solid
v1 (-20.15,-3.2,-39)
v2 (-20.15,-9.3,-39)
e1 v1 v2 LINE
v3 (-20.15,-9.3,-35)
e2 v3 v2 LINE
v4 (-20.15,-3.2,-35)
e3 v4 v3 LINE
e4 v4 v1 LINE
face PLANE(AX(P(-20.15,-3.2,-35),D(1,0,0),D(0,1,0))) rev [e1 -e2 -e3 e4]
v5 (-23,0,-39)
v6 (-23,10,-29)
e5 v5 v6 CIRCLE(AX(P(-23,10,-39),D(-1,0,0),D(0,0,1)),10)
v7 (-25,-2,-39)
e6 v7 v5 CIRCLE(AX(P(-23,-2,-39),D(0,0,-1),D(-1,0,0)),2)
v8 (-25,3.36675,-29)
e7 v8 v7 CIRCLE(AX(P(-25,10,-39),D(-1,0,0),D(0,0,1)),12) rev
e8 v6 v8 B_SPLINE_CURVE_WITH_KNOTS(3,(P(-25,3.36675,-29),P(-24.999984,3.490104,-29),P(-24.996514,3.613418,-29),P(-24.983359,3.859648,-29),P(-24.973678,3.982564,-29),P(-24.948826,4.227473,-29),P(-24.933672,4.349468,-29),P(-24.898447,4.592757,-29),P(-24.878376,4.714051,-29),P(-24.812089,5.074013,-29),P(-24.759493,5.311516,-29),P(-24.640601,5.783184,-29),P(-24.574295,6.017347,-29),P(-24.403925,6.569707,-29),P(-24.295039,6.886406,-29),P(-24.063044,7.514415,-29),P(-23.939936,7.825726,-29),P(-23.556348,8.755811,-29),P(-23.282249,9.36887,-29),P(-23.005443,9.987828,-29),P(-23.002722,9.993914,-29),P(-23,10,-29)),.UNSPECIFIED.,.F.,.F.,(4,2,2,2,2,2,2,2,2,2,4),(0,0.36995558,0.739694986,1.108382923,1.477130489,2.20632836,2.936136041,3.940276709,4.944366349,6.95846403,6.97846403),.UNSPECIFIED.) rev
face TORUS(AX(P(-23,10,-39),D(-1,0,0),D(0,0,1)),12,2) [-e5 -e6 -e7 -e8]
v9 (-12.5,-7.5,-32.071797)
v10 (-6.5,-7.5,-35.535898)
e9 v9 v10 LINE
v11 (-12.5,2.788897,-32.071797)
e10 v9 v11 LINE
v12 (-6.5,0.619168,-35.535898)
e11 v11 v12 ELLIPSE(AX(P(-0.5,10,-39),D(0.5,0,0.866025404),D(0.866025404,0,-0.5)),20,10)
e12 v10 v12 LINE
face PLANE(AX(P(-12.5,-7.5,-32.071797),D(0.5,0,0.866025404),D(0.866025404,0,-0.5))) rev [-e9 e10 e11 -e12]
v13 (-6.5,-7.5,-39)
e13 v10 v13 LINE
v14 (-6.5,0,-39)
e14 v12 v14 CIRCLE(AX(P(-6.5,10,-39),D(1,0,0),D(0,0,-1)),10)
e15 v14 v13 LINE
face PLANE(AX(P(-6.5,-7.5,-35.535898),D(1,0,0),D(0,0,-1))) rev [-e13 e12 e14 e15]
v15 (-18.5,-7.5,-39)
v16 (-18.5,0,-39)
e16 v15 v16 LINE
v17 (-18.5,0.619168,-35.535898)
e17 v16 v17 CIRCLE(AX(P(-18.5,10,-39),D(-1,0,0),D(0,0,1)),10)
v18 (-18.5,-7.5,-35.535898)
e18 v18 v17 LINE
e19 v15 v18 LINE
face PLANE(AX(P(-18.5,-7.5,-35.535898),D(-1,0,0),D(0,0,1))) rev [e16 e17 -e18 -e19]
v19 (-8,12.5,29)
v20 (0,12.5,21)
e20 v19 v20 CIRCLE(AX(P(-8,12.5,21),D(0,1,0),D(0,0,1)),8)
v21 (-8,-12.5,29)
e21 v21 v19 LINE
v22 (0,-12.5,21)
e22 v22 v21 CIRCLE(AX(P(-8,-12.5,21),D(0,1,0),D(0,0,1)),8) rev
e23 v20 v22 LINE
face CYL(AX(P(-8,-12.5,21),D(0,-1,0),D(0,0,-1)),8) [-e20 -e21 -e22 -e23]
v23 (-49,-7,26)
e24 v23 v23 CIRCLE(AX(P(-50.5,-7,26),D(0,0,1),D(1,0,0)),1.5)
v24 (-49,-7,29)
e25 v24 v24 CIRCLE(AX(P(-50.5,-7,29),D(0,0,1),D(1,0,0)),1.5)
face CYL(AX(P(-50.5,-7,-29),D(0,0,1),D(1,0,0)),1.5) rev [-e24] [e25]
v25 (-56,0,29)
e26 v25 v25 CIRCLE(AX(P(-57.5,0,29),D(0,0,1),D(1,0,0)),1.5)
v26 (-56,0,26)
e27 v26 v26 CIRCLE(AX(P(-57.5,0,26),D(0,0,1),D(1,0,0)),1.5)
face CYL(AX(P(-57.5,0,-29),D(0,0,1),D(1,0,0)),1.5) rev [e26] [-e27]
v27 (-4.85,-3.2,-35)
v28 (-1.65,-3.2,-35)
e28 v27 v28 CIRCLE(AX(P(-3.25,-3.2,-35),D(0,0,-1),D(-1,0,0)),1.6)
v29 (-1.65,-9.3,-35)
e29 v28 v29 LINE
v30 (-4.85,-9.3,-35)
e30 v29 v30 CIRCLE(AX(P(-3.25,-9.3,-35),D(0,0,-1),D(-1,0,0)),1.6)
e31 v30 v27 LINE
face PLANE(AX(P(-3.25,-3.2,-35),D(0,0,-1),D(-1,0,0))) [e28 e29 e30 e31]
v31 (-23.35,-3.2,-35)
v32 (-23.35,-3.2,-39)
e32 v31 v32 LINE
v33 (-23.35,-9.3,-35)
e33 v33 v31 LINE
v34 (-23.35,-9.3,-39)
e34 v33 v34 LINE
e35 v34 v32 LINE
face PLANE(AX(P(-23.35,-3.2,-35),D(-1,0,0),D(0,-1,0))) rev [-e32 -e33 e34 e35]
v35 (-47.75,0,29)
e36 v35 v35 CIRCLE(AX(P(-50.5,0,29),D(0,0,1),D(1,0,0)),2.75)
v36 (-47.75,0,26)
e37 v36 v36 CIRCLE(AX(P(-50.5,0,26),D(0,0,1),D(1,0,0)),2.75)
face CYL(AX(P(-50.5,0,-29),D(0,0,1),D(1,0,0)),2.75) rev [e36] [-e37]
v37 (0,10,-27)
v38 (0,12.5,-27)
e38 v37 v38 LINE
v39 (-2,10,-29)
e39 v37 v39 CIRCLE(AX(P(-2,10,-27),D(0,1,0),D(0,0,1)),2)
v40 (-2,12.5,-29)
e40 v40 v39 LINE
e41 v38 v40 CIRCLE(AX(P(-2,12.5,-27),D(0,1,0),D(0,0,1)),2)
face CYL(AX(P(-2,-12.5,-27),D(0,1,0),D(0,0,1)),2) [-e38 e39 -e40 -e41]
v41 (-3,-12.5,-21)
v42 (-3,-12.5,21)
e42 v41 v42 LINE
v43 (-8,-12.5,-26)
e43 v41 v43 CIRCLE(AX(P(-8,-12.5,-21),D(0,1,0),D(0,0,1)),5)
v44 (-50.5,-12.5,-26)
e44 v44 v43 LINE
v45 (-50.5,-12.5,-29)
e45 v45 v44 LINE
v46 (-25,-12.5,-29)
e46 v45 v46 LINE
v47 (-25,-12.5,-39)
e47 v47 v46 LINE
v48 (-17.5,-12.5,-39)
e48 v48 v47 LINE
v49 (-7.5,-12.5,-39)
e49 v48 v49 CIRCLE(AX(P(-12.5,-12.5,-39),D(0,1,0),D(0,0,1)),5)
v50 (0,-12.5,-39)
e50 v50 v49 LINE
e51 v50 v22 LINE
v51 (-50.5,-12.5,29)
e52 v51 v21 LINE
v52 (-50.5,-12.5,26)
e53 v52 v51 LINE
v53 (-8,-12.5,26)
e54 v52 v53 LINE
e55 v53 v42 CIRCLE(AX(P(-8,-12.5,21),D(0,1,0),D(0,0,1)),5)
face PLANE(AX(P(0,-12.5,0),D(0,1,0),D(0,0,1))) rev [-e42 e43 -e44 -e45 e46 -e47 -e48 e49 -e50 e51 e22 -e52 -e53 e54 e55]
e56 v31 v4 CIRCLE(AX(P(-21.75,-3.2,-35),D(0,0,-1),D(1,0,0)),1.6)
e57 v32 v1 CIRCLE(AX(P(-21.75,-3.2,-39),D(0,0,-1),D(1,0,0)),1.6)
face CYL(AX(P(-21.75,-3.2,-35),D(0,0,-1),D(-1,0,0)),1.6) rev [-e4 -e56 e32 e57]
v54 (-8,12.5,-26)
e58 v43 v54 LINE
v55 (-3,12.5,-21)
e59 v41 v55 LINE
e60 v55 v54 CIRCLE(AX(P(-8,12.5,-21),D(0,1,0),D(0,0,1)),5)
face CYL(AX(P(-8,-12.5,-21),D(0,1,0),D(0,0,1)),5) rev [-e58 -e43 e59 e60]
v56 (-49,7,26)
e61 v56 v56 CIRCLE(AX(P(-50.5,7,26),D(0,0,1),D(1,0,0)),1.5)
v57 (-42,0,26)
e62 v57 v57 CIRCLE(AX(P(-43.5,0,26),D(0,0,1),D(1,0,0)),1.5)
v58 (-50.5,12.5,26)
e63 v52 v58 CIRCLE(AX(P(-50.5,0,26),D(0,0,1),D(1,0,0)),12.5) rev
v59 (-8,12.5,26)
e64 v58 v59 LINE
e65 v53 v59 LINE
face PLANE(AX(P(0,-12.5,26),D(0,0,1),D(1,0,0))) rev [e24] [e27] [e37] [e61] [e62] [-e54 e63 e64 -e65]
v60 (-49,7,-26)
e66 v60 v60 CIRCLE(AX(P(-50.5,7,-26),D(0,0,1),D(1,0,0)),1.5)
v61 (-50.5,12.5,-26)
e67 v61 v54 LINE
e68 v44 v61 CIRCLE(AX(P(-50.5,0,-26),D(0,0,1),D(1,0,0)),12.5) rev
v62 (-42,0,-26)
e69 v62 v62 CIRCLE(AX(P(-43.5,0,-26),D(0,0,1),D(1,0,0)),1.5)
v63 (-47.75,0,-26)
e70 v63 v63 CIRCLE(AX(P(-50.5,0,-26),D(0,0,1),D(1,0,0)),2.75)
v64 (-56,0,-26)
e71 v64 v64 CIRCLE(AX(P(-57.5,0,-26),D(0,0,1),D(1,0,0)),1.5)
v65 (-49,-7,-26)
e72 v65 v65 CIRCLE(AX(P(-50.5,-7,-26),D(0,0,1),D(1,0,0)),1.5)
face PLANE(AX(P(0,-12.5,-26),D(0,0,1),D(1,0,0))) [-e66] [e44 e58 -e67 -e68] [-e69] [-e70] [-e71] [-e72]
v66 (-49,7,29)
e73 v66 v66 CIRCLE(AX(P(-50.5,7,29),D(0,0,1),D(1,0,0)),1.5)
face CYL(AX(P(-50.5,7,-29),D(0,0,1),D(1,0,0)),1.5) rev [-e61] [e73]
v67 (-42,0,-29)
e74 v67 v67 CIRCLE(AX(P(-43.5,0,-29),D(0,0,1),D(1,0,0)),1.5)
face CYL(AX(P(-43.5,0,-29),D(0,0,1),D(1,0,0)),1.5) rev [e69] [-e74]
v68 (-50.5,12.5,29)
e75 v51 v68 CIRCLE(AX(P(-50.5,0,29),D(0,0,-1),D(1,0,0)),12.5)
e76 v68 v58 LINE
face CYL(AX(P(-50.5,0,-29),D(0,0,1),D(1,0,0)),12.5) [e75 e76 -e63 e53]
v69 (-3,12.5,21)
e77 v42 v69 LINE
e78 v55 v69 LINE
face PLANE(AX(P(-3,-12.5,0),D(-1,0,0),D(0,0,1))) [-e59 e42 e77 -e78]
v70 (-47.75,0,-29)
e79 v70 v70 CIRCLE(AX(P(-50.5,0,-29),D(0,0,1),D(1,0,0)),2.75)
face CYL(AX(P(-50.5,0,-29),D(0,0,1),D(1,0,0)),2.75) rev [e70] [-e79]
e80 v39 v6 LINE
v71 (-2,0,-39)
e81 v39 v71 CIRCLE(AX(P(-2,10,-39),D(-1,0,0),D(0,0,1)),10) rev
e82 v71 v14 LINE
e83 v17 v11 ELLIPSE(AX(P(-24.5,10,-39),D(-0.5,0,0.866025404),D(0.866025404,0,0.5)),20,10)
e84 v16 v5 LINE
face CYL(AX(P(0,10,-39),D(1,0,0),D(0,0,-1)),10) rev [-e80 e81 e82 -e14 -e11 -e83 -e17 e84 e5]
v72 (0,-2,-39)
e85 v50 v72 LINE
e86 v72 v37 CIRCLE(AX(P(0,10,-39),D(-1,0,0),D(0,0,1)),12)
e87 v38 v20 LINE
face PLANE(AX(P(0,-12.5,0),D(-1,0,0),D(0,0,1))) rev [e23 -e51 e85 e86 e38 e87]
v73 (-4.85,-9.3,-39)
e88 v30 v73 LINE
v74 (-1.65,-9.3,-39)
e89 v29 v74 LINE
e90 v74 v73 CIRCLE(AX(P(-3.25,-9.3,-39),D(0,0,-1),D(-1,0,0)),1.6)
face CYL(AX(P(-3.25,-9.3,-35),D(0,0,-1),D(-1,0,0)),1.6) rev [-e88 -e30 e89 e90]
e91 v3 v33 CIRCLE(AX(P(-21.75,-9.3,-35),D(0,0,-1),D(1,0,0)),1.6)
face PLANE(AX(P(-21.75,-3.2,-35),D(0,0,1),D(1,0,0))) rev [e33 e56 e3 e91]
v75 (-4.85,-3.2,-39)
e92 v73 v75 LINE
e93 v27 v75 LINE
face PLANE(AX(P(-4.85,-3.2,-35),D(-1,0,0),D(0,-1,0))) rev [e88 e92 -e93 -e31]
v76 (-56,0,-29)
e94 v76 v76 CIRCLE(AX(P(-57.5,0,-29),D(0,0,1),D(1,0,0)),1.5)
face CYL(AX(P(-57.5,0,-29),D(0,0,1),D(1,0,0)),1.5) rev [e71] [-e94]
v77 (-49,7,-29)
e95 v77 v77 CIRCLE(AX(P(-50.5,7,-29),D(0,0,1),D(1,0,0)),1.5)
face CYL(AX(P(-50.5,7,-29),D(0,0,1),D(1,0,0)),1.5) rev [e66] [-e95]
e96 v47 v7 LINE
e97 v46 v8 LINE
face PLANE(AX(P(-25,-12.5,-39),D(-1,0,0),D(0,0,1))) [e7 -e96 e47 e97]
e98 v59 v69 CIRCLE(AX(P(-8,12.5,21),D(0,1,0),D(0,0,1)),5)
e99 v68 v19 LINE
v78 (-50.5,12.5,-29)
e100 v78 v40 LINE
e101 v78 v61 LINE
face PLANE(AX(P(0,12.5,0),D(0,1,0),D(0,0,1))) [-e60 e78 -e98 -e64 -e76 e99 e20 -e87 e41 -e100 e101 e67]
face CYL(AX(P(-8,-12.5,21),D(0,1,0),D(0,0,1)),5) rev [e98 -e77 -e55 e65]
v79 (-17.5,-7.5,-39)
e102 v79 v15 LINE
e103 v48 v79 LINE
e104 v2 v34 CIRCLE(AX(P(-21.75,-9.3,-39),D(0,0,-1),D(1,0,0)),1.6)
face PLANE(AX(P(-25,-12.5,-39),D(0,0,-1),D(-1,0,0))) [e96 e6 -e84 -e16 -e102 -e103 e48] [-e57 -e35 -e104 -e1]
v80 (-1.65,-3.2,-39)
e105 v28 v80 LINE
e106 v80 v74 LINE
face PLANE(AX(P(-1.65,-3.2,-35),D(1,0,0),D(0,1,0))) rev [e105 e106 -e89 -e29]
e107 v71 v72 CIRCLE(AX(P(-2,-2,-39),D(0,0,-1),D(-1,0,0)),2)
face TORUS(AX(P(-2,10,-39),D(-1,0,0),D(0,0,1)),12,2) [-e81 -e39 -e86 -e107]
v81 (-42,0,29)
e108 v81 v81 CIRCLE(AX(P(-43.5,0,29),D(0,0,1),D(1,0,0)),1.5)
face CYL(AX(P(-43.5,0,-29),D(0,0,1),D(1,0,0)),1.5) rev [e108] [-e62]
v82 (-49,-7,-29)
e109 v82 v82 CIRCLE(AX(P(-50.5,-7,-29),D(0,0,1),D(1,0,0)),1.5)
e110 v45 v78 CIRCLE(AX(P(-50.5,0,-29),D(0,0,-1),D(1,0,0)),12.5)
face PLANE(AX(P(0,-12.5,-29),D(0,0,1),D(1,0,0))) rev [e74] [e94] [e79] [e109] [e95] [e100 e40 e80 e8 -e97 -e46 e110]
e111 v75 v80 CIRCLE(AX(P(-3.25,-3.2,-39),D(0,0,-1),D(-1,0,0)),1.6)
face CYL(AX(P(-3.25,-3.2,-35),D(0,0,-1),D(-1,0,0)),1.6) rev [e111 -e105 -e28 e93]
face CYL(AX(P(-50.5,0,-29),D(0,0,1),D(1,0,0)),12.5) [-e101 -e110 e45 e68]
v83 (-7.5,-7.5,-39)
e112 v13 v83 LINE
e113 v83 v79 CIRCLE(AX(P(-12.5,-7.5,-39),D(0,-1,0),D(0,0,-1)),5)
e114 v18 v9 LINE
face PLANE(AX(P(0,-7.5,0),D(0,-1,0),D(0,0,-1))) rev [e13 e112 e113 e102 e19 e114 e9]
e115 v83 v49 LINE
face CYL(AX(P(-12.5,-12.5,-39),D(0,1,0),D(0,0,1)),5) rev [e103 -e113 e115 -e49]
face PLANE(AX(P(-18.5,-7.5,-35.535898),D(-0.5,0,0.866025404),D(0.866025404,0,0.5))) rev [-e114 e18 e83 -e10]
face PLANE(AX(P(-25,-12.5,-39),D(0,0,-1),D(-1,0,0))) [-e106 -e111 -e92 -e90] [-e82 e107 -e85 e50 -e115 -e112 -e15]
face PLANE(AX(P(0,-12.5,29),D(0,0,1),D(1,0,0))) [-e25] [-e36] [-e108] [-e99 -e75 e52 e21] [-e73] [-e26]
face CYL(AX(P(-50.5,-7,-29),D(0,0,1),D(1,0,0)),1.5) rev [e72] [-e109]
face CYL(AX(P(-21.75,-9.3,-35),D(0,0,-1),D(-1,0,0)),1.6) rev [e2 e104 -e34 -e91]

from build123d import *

# Parameters (mm, degrees)
BOSS_EXTRU_1_DEPTH      = 12.5
BOSS_EXTRU_1_DEPTH_BACK = 12.5
ESQUISSE2_R             = 2.75
ESQUISSE2_R_2           = 1.5
ENL_V_MAT_EXTRU_2_DEPTH = 87.540452969
ESQUISSE3_W             = 25
ESQUISSE3_H             = 10
BOSS_EXTRU_2_DEPTH      = 12.5
ENL_V_MAT_EXTRU_3_DEPTH = 7.5
CONG_1_R                = 8
ESQUISSE5_R             = 5
ENL_V_MAT_EXTRU_4_DEPTH = 77.746335417
ENL_V_MAT_EXTRU_5_DEPTH = 4
CONG_2_R                = 10
CONG_3_R                = 2


with BuildPart() as part:
    # Esquisse1 → Boss.-Extru.1 (new, two sides: drawn at the far end of the back side and taken through both)
    with BuildSketch(Plane(origin=(0, 0, 0), x_dir=(1, 0, 0), z_dir=(0, 1, 0)).offset(-BOSS_EXTRU_1_DEPTH_BACK)):
        with BuildLine():
            Line((-3, 21), (-3, -21))
            ThreePointArc((-3, -21), (-4.464466094, -24.535533906), (-8, -26))
            Line((-8, -26), (-63, -26))
            Line((-63, -26), (-63, -29))
            Line((-63, -29), (-3, -29))
            Line((-3, -29), (0, -29))
            Line((0, -29), (0, 29))
            Line((0, 29), (-3, 29))
            Line((-3, 29), (-63, 29))
            Line((-63, 29), (-63, 26))
            Line((-63, 26), (-8, 26))
            ThreePointArc((-8, 26), (-4.464466094, 24.535533906), (-3, 21))
        make_face()
    extrude(amount=BOSS_EXTRU_1_DEPTH + BOSS_EXTRU_1_DEPTH_BACK)

    # Esquisse2 → Enlèv. mat.-Extru.2 (cut, through all)
    with BuildSketch(Plane.XY.offset(29)):
        with Locations((-50.5, 0)):
            Circle(ESQUISSE2_R)
        with Locations((-57.5, 0)):
            Circle(ESQUISSE2_R_2)
        with Locations((-50.5, 7)):
            Circle(ESQUISSE2_R_2)
        with Locations((-43.5, 0)):
            Circle(ESQUISSE2_R_2)
        with Locations((-50.5, -7)):
            Circle(ESQUISSE2_R_2)
        with BuildLine():
            Line((-50.5, 12.5), (-68.703776387, 33.647767052))
            Line((-68.703776387, 33.647767052), (-74.904354154, -25.066543002))
            Line((-74.904354154, -25.066543002), (-54.406878728, -18.845916132))
            Line((-54.406878728, -18.845916132), (-50.5, -12.5))
            ThreePointArc((-50.5, -12.5), (-63, 0), (-50.5, 12.5))
        make_face()
    extrude(amount=-ENL_V_MAT_EXTRU_2_DEPTH, mode=Mode.SUBTRACT)

    # Esquisse3 → Boss.-Extru.2 (add)
    with BuildSketch(Plane(origin=(0, 0, 0), x_dir=(1, 0, 0), z_dir=(0, 1, 0))):
        with Locations((-12.5, 34)):
            Rectangle(ESQUISSE3_W, ESQUISSE3_H)
    extrude(amount=-BOSS_EXTRU_2_DEPTH)

    # Esquisse4 → Enlèv. mat.-Extru.3 (cut)
    with BuildSketch(Plane(origin=(0, 0, 0), x_dir=(1, 0, 0), z_dir=(0, 1, 0))):
        Polygon((-18.5, 39), (-6.5, 44), (-6.5, 35.535898385), (-12.5, 32.07179677), (-18.5, 35.535898385), align=None)
    extrude(amount=-ENL_V_MAT_EXTRU_3_DEPTH, mode=Mode.SUBTRACT)

    # Congé1
    cong_1_edges = [part.edges().sort_by_distance(p)[0] for p in [
        (0, 0, 29),
    ]]
    fillet(cong_1_edges, radius=CONG_1_R)

    # Esquisse5 → Enlèv. mat.-Extru.4 (cut, through all)
    with BuildSketch(Plane(origin=(0, -7.5, 0), x_dir=(1, 0, 0), z_dir=(0, 1, 0))):
        with Locations((-12.5, 39)):
            Circle(ESQUISSE5_R)
    extrude(amount=-ENL_V_MAT_EXTRU_4_DEPTH, mode=Mode.SUBTRACT)

    # Esquisse6 → Enlèv. mat.-Extru.5 (cut)
    with BuildSketch(Plane(origin=(0, 0, -39), x_dir=(-1, 0, 0), z_dir=(0, 0, -1))):
        with BuildLine():
            Line((4.85, -3.2), (4.85, -9.3))
            ThreePointArc((4.85, -9.3), (3.25, -10.9), (1.65, -9.3))
            Line((1.65, -9.3), (1.65, -3.2))
            ThreePointArc((1.65, -3.2), (3.25, -1.6), (4.85, -3.2))
        make_face()
        with BuildLine():
            Line((20.15, -3.2), (20.15, -9.3))
            ThreePointArc((20.15, -9.3), (21.75, -10.9), (23.35, -9.3))
            Line((23.35, -9.3), (23.35, -3.2))
            ThreePointArc((23.35, -3.2), (21.75, -1.6), (20.15, -3.2))
        make_face()
    extrude(amount=-ENL_V_MAT_EXTRU_5_DEPTH, mode=Mode.SUBTRACT)

    # Congé2
    # the kernel refuses this fillet: 10 mm, written as the material it adds along each edge
    with BuildSketch(Plane(origin=(0, 0, -29), x_dir=(0, 1, 0), z_dir=(-1, 0, 0))) as cong_2_piece_1_section:
        with BuildLine():
            CenterArc((CONG_2_R, CONG_2_R), CONG_2_R, 180, 90)
            Line((0, CONG_2_R), (0, 0))
            Line((0, 0), (CONG_2_R, 0))
        make_face()
    cong_2_piece_1 = extrude(amount=50, mode=Mode.PRIVATE)
    cong_2_piece_1 = split(cong_2_piece_1, bisect_by=Plane(origin=(-5.932407877, 2.249723915, -35.86359785), z_dir=(0.5000000000000038, 0, 0.8660254037844365)), keep=Keep.TOP, mode=Mode.PRIVATE)
    add(cong_2_piece_1)
    with BuildSketch(Plane(origin=(25, 0, -29), x_dir=(0, 1, 0), z_dir=(-1, 0, 0))) as cong_2_piece_2_section:
        with BuildLine():
            CenterArc((CONG_2_R, CONG_2_R), CONG_2_R, 180, 90)
            Line((0, CONG_2_R), (0, 0))
            Line((0, 0), (CONG_2_R, 0))
        make_face()
    cong_2_piece_2 = extrude(amount=75, mode=Mode.PRIVATE)
    cong_2_piece_2 = split(cong_2_piece_2, bisect_by=Plane(origin=(-6.5, 0.122528236, -36.916597474), z_dir=(1, 0, 0)), keep=Keep.TOP, mode=Mode.PRIVATE)
    cong_2_piece_2 = split(cong_2_piece_2, bisect_by=Plane(origin=(-5.005349392, 0.122528236, -36.398835316), z_dir=(-0.5000000000000038, 0, -0.8660254037844365)), keep=Keep.TOP, mode=Mode.PRIVATE)
    add(cong_2_piece_2)
    with BuildSketch(Plane(origin=(25, 0, -29), x_dir=(0, 1, 0), z_dir=(-1, 0, 0))) as cong_2_piece_3_section:
        with BuildLine():
            CenterArc((CONG_2_R, CONG_2_R), CONG_2_R, 180, 90)
            Line((0, CONG_2_R), (0, 0))
            Line((0, 0), (CONG_2_R, 0))
        make_face()
    cong_2_piece_3 = extrude(amount=50, mode=Mode.PRIVATE)
    cong_2_piece_3 = split(cong_2_piece_3, bisect_by=Plane(origin=(-18.5, 0.122528236, -36.916597474), z_dir=(-1, 0, 0)), keep=Keep.TOP, mode=Mode.PRIVATE)
    add(cong_2_piece_3)
    with BuildSketch(Plane(origin=(25, 0, -29), x_dir=(0, 1, 0), z_dir=(-1, 0, 0))) as cong_2_piece_4_section:
        with BuildLine():
            CenterArc((CONG_2_R, CONG_2_R), CONG_2_R, 180, 90)
            Line((0, CONG_2_R), (0, 0))
            Line((0, 0), (CONG_2_R, 0))
        make_face()
    cong_2_piece_4 = extrude(amount=75, mode=Mode.PRIVATE)
    cong_2_piece_4 = split(cong_2_piece_4, bisect_by=Plane(origin=(-15.261211998, 1.931548804, -33.66598326), z_dir=(-0.4999999999999996, 0, 0.8660254037844389)), keep=Keep.TOP, mode=Mode.PRIVATE)
    cong_2_piece_4 = split(cong_2_piece_4, bisect_by=Plane(origin=(-18.5, 1.931548804, -31.415325701), z_dir=(1, 0, 0)), keep=Keep.TOP, mode=Mode.PRIVATE)
    add(cong_2_piece_4)

    # Congé3
    cong_3_edges = [part.edges().sort_by_distance(p)[0] for p in [
        (-25, 2.928932188, -31.928932188),
        (0, 2.928932188, -31.928932188),
        (0, 11.25, -29),
    ]]
    fillet(cong_3_edges, radius=CONG_3_R)


solid = part.part
